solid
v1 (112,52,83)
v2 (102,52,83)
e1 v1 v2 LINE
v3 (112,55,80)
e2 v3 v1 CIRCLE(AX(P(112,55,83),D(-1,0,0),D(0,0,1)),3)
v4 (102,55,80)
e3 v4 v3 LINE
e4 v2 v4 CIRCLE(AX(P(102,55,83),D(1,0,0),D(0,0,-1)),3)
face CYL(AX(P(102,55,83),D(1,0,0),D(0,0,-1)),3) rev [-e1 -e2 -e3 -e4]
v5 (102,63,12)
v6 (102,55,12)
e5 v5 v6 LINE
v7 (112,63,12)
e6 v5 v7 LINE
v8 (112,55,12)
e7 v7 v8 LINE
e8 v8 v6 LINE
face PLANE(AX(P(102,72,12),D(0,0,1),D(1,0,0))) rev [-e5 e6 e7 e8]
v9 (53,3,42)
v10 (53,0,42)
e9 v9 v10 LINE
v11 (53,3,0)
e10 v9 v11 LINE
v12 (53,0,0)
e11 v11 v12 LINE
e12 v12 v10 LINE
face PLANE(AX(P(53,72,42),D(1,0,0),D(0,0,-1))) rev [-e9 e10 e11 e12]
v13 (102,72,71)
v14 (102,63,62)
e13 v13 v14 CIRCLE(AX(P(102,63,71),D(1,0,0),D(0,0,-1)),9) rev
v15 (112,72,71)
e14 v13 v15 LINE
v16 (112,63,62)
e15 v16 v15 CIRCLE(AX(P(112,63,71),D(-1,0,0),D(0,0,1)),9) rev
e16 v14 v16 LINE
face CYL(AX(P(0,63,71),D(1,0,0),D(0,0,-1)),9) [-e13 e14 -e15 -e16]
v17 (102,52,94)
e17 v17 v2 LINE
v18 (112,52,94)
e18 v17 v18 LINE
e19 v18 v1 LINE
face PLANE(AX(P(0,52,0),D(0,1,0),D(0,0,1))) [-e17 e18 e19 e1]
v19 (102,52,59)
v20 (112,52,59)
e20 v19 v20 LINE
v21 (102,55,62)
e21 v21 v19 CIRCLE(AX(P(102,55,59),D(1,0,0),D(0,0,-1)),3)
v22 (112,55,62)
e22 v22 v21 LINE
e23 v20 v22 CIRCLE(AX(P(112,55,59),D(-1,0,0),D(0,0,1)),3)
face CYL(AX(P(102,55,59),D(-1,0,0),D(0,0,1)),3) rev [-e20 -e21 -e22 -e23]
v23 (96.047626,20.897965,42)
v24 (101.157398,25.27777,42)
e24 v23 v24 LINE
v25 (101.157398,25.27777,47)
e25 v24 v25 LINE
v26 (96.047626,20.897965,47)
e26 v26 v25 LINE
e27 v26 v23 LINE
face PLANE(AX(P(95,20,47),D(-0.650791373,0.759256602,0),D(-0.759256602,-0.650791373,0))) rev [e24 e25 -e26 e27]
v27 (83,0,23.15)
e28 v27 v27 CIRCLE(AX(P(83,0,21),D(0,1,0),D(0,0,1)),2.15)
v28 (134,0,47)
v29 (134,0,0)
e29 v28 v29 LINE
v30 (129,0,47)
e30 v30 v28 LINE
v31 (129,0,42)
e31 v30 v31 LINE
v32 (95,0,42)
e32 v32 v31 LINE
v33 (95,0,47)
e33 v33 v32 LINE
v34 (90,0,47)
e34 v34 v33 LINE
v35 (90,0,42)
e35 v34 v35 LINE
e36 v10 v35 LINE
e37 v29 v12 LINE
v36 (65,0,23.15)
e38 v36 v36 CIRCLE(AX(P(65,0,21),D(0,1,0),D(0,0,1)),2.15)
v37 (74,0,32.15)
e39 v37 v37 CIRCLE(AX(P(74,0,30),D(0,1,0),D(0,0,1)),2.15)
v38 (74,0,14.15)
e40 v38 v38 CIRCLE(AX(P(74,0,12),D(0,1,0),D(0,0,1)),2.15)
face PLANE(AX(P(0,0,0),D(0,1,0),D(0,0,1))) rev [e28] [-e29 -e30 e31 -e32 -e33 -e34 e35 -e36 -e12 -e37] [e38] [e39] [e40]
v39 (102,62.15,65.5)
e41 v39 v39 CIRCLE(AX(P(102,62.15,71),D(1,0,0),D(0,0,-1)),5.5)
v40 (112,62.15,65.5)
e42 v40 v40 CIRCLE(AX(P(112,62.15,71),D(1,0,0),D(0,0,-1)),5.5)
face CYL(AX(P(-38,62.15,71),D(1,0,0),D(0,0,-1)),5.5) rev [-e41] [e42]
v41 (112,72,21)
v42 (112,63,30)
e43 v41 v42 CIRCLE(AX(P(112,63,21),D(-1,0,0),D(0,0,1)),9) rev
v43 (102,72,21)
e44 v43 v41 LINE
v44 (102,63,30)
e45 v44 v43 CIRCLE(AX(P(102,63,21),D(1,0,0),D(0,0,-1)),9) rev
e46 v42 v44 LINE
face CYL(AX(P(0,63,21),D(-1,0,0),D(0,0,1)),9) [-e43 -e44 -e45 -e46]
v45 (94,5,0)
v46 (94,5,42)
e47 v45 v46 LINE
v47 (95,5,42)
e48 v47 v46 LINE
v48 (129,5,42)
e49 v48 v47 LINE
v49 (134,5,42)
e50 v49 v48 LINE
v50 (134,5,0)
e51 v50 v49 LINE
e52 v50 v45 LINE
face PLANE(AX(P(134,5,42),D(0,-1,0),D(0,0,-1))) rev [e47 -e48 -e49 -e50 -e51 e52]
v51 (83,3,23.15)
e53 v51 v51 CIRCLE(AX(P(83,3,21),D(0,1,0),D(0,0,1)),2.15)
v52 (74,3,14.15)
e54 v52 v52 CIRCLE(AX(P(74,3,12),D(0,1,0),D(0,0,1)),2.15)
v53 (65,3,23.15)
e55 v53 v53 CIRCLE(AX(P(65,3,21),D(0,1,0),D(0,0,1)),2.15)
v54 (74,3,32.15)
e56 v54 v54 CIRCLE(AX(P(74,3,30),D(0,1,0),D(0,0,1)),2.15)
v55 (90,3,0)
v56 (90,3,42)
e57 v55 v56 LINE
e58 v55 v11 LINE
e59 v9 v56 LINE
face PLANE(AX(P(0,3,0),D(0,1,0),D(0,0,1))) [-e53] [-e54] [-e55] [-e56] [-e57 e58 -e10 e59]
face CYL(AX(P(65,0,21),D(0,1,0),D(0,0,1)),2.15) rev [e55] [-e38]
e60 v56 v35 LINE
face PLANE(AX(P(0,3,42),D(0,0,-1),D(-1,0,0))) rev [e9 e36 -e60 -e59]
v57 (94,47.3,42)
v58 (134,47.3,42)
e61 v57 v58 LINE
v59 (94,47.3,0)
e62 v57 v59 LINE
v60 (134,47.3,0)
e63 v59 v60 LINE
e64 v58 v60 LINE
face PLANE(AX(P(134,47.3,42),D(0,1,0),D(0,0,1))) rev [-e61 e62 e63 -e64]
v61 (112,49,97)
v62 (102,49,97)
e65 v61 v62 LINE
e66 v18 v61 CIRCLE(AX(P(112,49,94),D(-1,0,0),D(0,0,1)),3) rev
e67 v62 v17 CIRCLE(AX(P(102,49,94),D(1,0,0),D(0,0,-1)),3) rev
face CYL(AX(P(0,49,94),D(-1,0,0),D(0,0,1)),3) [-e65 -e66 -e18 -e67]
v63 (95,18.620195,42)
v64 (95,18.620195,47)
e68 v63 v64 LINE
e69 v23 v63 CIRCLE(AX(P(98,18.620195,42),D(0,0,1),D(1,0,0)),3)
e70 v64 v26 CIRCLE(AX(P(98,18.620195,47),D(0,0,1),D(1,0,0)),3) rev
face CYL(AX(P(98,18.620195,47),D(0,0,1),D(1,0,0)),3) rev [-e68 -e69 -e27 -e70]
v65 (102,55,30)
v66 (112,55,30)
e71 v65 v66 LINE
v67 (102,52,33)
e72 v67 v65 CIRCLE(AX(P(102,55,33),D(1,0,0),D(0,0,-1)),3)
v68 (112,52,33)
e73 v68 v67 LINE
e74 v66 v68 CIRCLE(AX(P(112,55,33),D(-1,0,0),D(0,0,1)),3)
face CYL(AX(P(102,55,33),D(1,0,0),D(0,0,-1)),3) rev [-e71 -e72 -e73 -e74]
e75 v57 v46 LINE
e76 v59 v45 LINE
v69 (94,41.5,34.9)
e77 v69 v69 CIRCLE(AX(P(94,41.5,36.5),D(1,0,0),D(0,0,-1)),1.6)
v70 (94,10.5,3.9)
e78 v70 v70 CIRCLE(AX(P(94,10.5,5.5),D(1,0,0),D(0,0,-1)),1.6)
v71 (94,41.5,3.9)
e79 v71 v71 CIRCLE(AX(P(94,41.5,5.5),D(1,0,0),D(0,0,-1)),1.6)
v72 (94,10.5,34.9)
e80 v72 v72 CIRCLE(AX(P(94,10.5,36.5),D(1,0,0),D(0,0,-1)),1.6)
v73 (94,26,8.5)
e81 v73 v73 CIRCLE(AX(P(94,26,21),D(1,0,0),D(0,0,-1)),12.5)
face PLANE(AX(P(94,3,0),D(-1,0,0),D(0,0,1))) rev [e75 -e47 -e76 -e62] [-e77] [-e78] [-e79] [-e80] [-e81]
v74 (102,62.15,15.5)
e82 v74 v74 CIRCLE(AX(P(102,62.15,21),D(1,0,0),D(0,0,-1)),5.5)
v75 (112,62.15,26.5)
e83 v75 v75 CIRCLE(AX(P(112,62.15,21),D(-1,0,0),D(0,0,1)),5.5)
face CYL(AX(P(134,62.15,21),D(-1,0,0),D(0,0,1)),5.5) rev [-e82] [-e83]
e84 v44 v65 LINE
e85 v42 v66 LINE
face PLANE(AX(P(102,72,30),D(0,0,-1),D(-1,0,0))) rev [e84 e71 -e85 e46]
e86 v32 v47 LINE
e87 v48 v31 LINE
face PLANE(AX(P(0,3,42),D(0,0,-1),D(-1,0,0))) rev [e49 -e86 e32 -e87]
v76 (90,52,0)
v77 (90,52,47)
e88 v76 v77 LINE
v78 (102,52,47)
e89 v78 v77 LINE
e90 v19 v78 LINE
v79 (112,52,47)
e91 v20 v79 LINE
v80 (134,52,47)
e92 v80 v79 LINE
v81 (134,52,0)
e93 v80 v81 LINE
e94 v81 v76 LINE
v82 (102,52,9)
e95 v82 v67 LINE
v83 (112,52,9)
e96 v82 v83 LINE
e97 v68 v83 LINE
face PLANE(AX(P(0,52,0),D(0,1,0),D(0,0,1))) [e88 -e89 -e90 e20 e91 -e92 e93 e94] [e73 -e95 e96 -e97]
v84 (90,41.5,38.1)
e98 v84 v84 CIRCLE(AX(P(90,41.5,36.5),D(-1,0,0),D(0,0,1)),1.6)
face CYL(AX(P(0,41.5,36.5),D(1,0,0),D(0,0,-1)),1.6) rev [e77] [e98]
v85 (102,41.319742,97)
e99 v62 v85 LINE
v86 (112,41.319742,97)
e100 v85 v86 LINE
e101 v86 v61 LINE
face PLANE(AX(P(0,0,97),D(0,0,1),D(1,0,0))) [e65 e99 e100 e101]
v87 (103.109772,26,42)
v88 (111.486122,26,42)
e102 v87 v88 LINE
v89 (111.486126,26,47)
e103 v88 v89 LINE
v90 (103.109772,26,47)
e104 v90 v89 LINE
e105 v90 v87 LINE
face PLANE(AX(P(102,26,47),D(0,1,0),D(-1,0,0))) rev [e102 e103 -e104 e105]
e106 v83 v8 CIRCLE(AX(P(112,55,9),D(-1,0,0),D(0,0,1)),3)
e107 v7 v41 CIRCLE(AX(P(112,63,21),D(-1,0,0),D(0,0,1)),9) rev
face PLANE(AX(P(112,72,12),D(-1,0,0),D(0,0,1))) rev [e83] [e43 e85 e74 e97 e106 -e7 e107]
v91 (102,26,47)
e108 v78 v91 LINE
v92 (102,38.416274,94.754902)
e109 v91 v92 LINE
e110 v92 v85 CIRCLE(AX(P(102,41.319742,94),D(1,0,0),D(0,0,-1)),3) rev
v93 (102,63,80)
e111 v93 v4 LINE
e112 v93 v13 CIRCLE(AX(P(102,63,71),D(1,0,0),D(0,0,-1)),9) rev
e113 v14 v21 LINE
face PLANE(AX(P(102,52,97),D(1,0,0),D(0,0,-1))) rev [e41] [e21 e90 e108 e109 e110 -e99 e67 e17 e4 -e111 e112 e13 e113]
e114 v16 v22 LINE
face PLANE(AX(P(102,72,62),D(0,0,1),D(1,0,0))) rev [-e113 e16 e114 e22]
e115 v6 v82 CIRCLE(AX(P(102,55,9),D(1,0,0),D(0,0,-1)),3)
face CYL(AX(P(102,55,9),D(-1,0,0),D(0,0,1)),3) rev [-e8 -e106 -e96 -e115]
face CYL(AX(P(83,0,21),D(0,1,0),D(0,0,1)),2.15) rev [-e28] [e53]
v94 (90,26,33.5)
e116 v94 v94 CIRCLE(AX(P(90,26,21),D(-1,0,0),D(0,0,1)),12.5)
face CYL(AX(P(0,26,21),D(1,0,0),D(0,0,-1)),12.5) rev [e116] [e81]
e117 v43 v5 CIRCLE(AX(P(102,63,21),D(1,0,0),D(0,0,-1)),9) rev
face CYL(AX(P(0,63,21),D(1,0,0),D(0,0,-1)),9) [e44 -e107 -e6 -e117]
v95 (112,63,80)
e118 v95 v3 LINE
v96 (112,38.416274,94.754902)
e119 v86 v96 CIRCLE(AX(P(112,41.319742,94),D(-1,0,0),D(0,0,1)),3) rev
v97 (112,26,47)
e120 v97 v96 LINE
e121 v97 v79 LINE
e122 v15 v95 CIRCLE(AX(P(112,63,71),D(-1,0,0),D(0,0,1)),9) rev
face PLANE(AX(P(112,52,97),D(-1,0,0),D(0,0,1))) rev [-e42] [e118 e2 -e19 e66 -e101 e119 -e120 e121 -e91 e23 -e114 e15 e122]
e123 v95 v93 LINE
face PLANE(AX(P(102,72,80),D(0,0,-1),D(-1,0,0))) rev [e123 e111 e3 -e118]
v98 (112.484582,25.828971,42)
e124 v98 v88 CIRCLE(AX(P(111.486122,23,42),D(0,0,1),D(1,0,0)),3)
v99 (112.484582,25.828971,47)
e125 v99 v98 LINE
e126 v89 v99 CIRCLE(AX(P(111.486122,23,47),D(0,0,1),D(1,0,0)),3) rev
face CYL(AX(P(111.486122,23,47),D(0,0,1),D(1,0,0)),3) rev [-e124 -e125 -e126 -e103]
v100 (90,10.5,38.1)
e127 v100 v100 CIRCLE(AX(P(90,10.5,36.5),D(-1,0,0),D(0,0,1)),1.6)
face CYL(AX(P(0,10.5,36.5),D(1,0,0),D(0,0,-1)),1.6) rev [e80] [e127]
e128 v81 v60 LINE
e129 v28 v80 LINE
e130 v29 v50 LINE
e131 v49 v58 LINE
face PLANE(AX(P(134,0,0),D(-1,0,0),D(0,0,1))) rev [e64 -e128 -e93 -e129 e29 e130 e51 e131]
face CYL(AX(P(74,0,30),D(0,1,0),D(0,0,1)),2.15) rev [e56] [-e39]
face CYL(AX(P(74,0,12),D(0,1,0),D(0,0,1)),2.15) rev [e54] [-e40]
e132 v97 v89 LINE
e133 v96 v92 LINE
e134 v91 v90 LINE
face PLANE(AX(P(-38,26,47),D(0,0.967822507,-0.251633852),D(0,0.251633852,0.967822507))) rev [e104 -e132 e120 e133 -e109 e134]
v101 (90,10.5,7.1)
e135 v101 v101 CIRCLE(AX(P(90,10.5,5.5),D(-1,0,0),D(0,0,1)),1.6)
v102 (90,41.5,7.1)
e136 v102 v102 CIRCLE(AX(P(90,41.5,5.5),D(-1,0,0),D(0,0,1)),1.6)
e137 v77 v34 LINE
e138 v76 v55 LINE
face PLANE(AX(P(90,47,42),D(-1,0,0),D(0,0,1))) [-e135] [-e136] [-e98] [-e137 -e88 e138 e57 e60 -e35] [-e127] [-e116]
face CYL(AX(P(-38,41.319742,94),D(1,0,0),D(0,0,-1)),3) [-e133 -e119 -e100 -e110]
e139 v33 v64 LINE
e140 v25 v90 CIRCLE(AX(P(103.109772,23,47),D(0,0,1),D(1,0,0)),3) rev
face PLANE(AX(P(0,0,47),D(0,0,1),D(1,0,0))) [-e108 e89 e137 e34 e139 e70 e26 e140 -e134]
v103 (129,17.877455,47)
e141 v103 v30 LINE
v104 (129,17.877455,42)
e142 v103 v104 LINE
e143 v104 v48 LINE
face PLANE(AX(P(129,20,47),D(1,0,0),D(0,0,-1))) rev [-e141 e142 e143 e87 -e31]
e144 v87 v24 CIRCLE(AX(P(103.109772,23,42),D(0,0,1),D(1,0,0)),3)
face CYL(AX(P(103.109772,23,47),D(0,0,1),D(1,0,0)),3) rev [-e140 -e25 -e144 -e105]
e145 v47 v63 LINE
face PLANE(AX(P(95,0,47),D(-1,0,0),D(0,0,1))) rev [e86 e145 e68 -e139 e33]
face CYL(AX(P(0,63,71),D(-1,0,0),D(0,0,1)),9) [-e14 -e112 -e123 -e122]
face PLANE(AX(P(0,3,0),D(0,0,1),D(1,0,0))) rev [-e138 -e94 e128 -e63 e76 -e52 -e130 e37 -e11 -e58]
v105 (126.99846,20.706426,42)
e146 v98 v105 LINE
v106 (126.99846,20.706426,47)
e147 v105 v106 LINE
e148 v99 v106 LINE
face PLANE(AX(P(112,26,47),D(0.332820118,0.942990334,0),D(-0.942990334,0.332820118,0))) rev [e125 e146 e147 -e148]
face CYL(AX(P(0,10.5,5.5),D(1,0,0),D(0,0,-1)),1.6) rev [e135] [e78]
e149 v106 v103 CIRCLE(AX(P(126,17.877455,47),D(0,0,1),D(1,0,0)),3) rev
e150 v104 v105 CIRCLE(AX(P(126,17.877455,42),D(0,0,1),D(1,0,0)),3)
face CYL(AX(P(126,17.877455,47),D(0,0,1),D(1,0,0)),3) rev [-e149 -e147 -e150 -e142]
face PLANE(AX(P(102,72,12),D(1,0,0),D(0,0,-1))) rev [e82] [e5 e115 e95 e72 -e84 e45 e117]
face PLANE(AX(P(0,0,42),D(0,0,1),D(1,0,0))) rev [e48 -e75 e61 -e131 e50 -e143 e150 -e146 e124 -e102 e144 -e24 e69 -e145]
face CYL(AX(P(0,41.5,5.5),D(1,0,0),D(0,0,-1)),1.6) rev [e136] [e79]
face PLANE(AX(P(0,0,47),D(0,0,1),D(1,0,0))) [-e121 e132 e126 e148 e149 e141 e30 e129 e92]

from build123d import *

# Parameters (mm, degrees)
SKETCH1_W            = 94
SKETCH1_H            = 42
BOSS_EXTRUDE1_DEPTH  = 3
SKETCH2_W            = 4
SKETCH2_H            = 42
BOSS_EXTRUDE2_DEPTH  = 47
SKETCH3_R            = 12.5
SKETCH3_R_2          = 1.6
CUT_EXTRUDE1_DEPTH   = 114.176852757
SKETCH4_W            = 42
SKETCH4_H            = 5
BOSS_EXTRUDE3_DEPTH  = 40
SKETCH5_W            = 42
SKETCH5_H            = 5
BOSS_EXTRUDE4_DEPTH  = 38
SKETCH7_W            = 42
SKETCH7_H            = 42
SKETCH7_W_2          = 44
BOSS_EXTRUDE6_DEPTH  = 5
SKETCH9_R            = 2.15
CUT_EXTRUDE2_DEPTH   = 149.731301346
SKETCH11_W           = 10
SKETCH11_H           = 18
BOSS_EXTRUDE7_DEPTH  = 20
SKETCH13_R           = 5.5
CUT_EXTRUDE3_DEPTH   = 169.988165266
BOSS_EXTRUDE11_DEPTH = 5
SKETCH23_W           = 10
SKETCH23_H           = 26
BOSS_EXTRUDE12_DEPTH = 50
CUT_EXTRUDE7_DEPTH   = 193.595430891
SKETCH25_W           = 10
SKETCH25_H           = 18
BOSS_EXTRUDE13_DEPTH = 20
SKETCH26_R           = 5.5
CUT_EXTRUDE8_DEPTH   = 193.595430891
SKETCH27_W           = 12
SKETCH27_H           = 18
BOSS_EXTRUDE14_DEPTH = 69
CUT_EXTRUDE10_START  = -5
SKETCH28_R           = 5.5
CUT_EXTRUDE10_DEPTH  = 5
SKETCH29_R           = 5.5
CUT_EXTRUDE11_DEPTH  = 5
FILLET4_R            = 9
FILLET3_R            = 3
SKETCH30_W           = 91
SKETCH30_H           = 42
CUT_EXTRUDE12_DEPTH  = 181.413414135
SKETCH31_W           = 40
SKETCH31_H           = 0.3
CUT_EXTRUDE13_DEPTH  = 42


# Some blends are built 0.0001 mm under size
with BuildPart() as part:
    # Sketch1 → Boss-Extrude1 (new body)
    with BuildSketch(Plane(origin=(0, 0, 0), x_dir=(1, 0, 0), z_dir=(0, 1, 0))):
        with Locations((47, -21)):
            Rectangle(SKETCH1_W, SKETCH1_H)
    extrude(amount=BOSS_EXTRUDE1_DEPTH)

    # Sketch2 → Boss-Extrude2 (add)
    with BuildSketch(Plane.XZ):
        with Locations((2, 21)):
            Rectangle(SKETCH2_W, SKETCH2_H)
        with Locations((92, 21)):
            Rectangle(SKETCH2_W, SKETCH2_H)
    extrude(amount=-BOSS_EXTRUDE2_DEPTH)

    # Sketch3 → Cut-Extrude1 (cut, through all)
    with BuildSketch(Plane(origin=(94, 0, 0), x_dir=(0, 0, -1), z_dir=(1, 0, 0))):
        with Locations((-21, 26)):
            Circle(SKETCH3_R)
        with Locations((-36.5, 41.5)):
            Circle(SKETCH3_R_2)
        with Locations((-5.5, 41.5)):
            Circle(SKETCH3_R_2)
        with Locations((-36.5, 10.5)):
            Circle(SKETCH3_R_2)
        with Locations((-5.5, 10.5)):
            Circle(SKETCH3_R_2)
    extrude(amount=-CUT_EXTRUDE1_DEPTH, mode=Mode.SUBTRACT)

    # Sketch4 → Boss-Extrude3 (add)
    with BuildSketch(Plane(origin=(94, 0, 0), x_dir=(0, 0, -1), z_dir=(1, 0, 0))):
        with Locations((-21, 2.5)):
            Rectangle(SKETCH4_W, SKETCH4_H)
    extrude(amount=BOSS_EXTRUDE3_DEPTH)

    # Sketch5 → Boss-Extrude4 (add)
    with BuildSketch(Plane.ZY):
        with Locations((21, 2.5)):
            Rectangle(SKETCH5_W, SKETCH5_H)
    extrude(amount=BOSS_EXTRUDE4_DEPTH)

    # Sketch7 → Boss-Extrude6 (add)
    with BuildSketch(Plane(origin=(0, 47, 0), x_dir=(1, 0, 0), z_dir=(0, 1, 0))):
        with Locations((-17, -21)):
            Rectangle(SKETCH7_W, SKETCH7_H)
        with Locations((112, -21)):
            Rectangle(SKETCH7_W_2, SKETCH7_H)
    extrude(amount=BOSS_EXTRUDE6_DEPTH)

    # Sketch9 → Cut-Extrude2 (cut, through all)
    with BuildSketch(Plane(origin=(0, 3, 0), x_dir=(1, 0, 0), z_dir=(0, 1, 0))):
        with Locations(Location((83, -21, 0), (0, 0, 270))):
            Circle(SKETCH9_R)
        with Locations(Location((65, -21, 0), (0, 0, 270))):
            Circle(SKETCH9_R)
        with Locations(Location((74, -12, 0), (0, 0, 270))):
            Circle(SKETCH9_R)
        with Locations(Location((74, -30, 0), (0, 0, 270))):
            Circle(SKETCH9_R)
        with Locations(Location((22, -12, 0), (0, 0, 270))):
            Circle(SKETCH9_R)
        with Locations(Location((22, -30, 0), (0, 0, 270))):
            Circle(SKETCH9_R)
    extrude(amount=-CUT_EXTRUDE2_DEPTH, mode=Mode.SUBTRACT)

    # Sketch11 → Boss-Extrude7 (add)
    with BuildSketch(Plane(origin=(0, 52, 0), x_dir=(1, 0, 0), z_dir=(0, 1, 0))):
        with Locations((-8, -21)):
            Rectangle(SKETCH11_W, SKETCH11_H)
        with Locations((107, -21)):
            Rectangle(SKETCH11_W, SKETCH11_H)
    extrude(amount=BOSS_EXTRUDE7_DEPTH)

    # Sketch13 → Cut-Extrude3 (cut, through all)
    with BuildSketch(Plane.ZY.offset(13)):
        with Locations((21, 62.15)):
            Circle(SKETCH13_R)
    extrude(amount=-CUT_EXTRUDE3_DEPTH, mode=Mode.SUBTRACT)

    # Sketch20 → Boss-Extrude11 (add)
    with BuildSketch(Plane.XY.offset(42)):
        Polygon((134, 0), (134, 52), (90, 52), (90, 0), (95, 0), (95, 20), (102, 26), (112, 26), (129, 20), (129, 0), align=None)
    extrude(amount=BOSS_EXTRUDE11_DEPTH)

    # Sketch23 → Boss-Extrude12 (add)
    with BuildSketch(Plane.XY.offset(47)):
        with Locations((107, 39)):
            Rectangle(SKETCH23_W, SKETCH23_H)
    extrude(amount=BOSS_EXTRUDE12_DEPTH)

    # Sketch24 → Cut-Extrude7 (cut, through all)
    with BuildSketch(Plane(origin=(112, 0, 0), x_dir=(0, 0, -1), z_dir=(1, 0, 0))):
        Polygon((-47, 26), (-97, 39), (-97, 26), align=None)
    extrude(amount=-CUT_EXTRUDE7_DEPTH, mode=Mode.SUBTRACT)

    # Sketch25 → Boss-Extrude13 (add)
    with BuildSketch(Plane(origin=(0, 52, 0), x_dir=(1, 0, 0), z_dir=(0, 1, 0))):
        with Locations((107, -71)):
            Rectangle(SKETCH25_W, SKETCH25_H)
    extrude(amount=BOSS_EXTRUDE13_DEPTH)

    # Sketch26 → Cut-Extrude8 (cut, through all)
    with BuildSketch(Plane(origin=(112, 0, 0), x_dir=(0, 0, -1), z_dir=(1, 0, 0))):
        with Locations((-71, 62.15)):
            Circle(SKETCH26_R)
    extrude(amount=-CUT_EXTRUDE8_DEPTH, mode=Mode.SUBTRACT)

    # Sketch27 → Boss-Extrude14 (add)
    with BuildSketch(Plane(origin=(0, 3, 0), x_dir=(1, 0, 0), z_dir=(0, 1, 0))):
        with Locations((47, -21)):
            Rectangle(SKETCH27_W, SKETCH27_H)
    extrude(amount=BOSS_EXTRUDE14_DEPTH)

    # Sketch28 → Cut-Extrude10 (cut)
    with BuildSketch(Plane(origin=(53, 0, 0), x_dir=(0, 0, -1), z_dir=(1, 0, 0)).offset(CUT_EXTRUDE10_START)):
        with Locations(Location((-21, 62.15, 0), (0, 0, 180))):
            Circle(SKETCH28_R)
    extrude(amount=CUT_EXTRUDE10_DEPTH, mode=Mode.SUBTRACT)

    # Sketch29 → Cut-Extrude11 (cut)
    with BuildSketch(Plane.ZY.offset(-41)):
        with Locations((21, 62.15)):
            Circle(SKETCH29_R)
    extrude(amount=-CUT_EXTRUDE11_DEPTH, mode=Mode.SUBTRACT)

    # Fillet4
    fillet4_edges = [part.edges().sort_by_distance(p)[0] for p in [
        (-8, 72, 12),
        (-8, 72, 30),
        (107, 72, 12),
        (107, 72, 30),
        (107, 72, 62),
        (107, 72, 80),
        (47, 72, 12),
        (47, 72, 30),
    ]]
    fillet(fillet4_edges, radius=FILLET4_R - 0.0001)  # a hair under: the kernel refuses the full size

    # Fillet3
    # the kernel refuses this fillet: 3 mm, written as the material it adds along each edge
    with BuildSketch(Plane(origin=(-3, 52, 30), x_dir=(0, 1, 0), z_dir=(-1, 0, 0)), Plane(origin=(112, 52, 80), x_dir=(0, 1, 0), z_dir=(-1, 0, 0))) as fillet3_piece_1:
        with BuildLine():
            CenterArc((FILLET3_R, -FILLET3_R), FILLET3_R, 90, 90)
            Line((0, -FILLET3_R), (0, 0))
            Line((0, 0), (FILLET3_R, 0))
        make_face()
    extrude(amount=10)
    with BuildSketch(Plane(origin=(-13, 52, 12), x_dir=(0, 0, -1), z_dir=(1, 0, 0)), Plane(origin=(112, 52, 30), x_dir=(0, 0, 1), z_dir=(-1, 0, 0)), Plane(origin=(102, 52, 12), x_dir=(0, 0, -1), z_dir=(1, 0, 0)), Plane(origin=(102, 52, 62), x_dir=(0, 0, -1), z_dir=(1, 0, 0))) as fillet3_piece_2:
        with BuildLine():
            CenterArc((FILLET3_R, FILLET3_R), FILLET3_R, 180, 90)
            Line((0, FILLET3_R), (0, 0))
            Line((0, 0), (FILLET3_R, 0))
        make_face()
    extrude(amount=10)
    with BuildSketch(Plane(origin=(95, 20, 42), x_dir=(0, -1, 0), z_dir=(0, 0, 1))) as fillet3_piece_3:
        with BuildLine():
            CenterArc((FILLET3_R * 0.45993492247, FILLET3_R), FILLET3_R, 220.601294645, 49.398705355)
            Line((-FILLET3_R * 0.299321679895, FILLET3_R * 0.349208626544), (0, 0))
            Line((0, 0), (FILLET3_R * 0.45993492247, 0))
        make_face()
    extrude(amount=5)
    with BuildSketch(Plane(origin=(102, 26, 42), x_dir=(-0.7592566023652966, -0.6507913734559685, 0), z_dir=(0, 0, 1))) as fillet3_piece_4:
        with BuildLine():
            CenterArc((FILLET3_R * 0.369924076215, FILLET3_R), FILLET3_R, 229.398705355, 40.601294645)
            Line((-FILLET3_R * 0.28086729724, FILLET3_R * 0.240743397635), (0, 0))
            Line((0, 0), (FILLET3_R * 0.369924076215, 0))
        make_face()
    extrude(amount=5)
    with BuildSketch(Plane(origin=(112, 26, 42), x_dir=(0.942990333582889, -0.3328201177351389, 0), z_dir=(0, 0, 1))) as fillet3_piece_5:
        with BuildLine():
            CenterArc((FILLET3_R * 0.171292729553, -FILLET3_R), FILLET3_R, 90, 19.440034828)
            Line((-FILLET3_R * 0.161527388182, -FILLET3_R * 0.0570096664171), (0, 0))
            Line((0, 0), (FILLET3_R * 0.171292729553, 0))
        make_face()
    extrude(amount=5)
    with BuildSketch(Plane(origin=(129, 20, 42), x_dir=(0, -1, 0), z_dir=(0, 0, 1))) as fillet3_piece_6:
        with BuildLine():
            CenterArc((FILLET3_R * 0.707515081019, -FILLET3_R), FILLET3_R, 90, 70.559965172)
            Line((-FILLET3_R * 0.235475252564, -FILLET3_R * 0.667179882265), (0, 0))
            Line((0, 0), (FILLET3_R * 0.707515081019, 0))
        make_face()
    extrude(amount=5)
    with BuildSketch(Plane(origin=(53, 3, 30), x_dir=(0, 0, 1), z_dir=(-1, 0, 0)), Plane(origin=(41, 3, 12), x_dir=(0, 0, -1), z_dir=(1, 0, 0))) as fillet3_piece_7:
        with BuildLine():
            CenterArc((FILLET3_R, FILLET3_R), FILLET3_R, 180, 90)
            Line((0, FILLET3_R), (0, 0))
            Line((0, 0), (FILLET3_R, 0))
        make_face()
    extrude(amount=12)
    # the kernel refuses this fillet: 3 mm, written as the material it takes off along each edge
    with BuildSketch(Plane(origin=(94.5, 52, 97), x_dir=(0, 0, -1), z_dir=(1, 0, 0))) as fillet3_2_piece_1:
        with BuildLine():
            CenterArc((FILLET3_R, -FILLET3_R), FILLET3_R, 90, 90)
            Line((0, -FILLET3_R), (0, 0))
            Line((0, 0), (FILLET3_R, 0))
        make_face()
    extrude(amount=25, mode=Mode.SUBTRACT)
    with BuildSketch(Plane(origin=(117.799354812, 39, 97), x_dir=(0, -0.25163385176495195, -0.9678225067882716), z_dir=(-1, 0, 0))) as fillet3_2_piece_2:
        with BuildLine():
            CenterArc((FILLET3_R * 0.773247308247, -FILLET3_R), FILLET3_R, 90, 75.425783802)
            Line((-FILLET3_R * 0.194575198541, -FILLET3_R * 0.748366148235), (0, 0))
            Line((0, 0), (FILLET3_R * 0.773247308247, 0))
        make_face()
    extrude(amount=21.598709624, mode=Mode.SUBTRACT)

    # Sketch30 → Cut-Extrude12 (cut, through all)
    with BuildSketch(Plane.XZ):
        with Locations((7.5, 21)):
            Rectangle(SKETCH30_W, SKETCH30_H)
    extrude(amount=-CUT_EXTRUDE12_DEPTH, mode=Mode.SUBTRACT)

    # Sketch31 → Cut-Extrude13 (cut)
    with BuildSketch(Plane(origin=(0, 0, 0), x_dir=(-1, 0, 0), z_dir=(0, 0, -1))):
        with Locations((-114, 47.15)):
            Rectangle(SKETCH31_W, SKETCH31_H)
    extrude(amount=-CUT_EXTRUDE13_DEPTH, mode=Mode.SUBTRACT)


solid = part.part
